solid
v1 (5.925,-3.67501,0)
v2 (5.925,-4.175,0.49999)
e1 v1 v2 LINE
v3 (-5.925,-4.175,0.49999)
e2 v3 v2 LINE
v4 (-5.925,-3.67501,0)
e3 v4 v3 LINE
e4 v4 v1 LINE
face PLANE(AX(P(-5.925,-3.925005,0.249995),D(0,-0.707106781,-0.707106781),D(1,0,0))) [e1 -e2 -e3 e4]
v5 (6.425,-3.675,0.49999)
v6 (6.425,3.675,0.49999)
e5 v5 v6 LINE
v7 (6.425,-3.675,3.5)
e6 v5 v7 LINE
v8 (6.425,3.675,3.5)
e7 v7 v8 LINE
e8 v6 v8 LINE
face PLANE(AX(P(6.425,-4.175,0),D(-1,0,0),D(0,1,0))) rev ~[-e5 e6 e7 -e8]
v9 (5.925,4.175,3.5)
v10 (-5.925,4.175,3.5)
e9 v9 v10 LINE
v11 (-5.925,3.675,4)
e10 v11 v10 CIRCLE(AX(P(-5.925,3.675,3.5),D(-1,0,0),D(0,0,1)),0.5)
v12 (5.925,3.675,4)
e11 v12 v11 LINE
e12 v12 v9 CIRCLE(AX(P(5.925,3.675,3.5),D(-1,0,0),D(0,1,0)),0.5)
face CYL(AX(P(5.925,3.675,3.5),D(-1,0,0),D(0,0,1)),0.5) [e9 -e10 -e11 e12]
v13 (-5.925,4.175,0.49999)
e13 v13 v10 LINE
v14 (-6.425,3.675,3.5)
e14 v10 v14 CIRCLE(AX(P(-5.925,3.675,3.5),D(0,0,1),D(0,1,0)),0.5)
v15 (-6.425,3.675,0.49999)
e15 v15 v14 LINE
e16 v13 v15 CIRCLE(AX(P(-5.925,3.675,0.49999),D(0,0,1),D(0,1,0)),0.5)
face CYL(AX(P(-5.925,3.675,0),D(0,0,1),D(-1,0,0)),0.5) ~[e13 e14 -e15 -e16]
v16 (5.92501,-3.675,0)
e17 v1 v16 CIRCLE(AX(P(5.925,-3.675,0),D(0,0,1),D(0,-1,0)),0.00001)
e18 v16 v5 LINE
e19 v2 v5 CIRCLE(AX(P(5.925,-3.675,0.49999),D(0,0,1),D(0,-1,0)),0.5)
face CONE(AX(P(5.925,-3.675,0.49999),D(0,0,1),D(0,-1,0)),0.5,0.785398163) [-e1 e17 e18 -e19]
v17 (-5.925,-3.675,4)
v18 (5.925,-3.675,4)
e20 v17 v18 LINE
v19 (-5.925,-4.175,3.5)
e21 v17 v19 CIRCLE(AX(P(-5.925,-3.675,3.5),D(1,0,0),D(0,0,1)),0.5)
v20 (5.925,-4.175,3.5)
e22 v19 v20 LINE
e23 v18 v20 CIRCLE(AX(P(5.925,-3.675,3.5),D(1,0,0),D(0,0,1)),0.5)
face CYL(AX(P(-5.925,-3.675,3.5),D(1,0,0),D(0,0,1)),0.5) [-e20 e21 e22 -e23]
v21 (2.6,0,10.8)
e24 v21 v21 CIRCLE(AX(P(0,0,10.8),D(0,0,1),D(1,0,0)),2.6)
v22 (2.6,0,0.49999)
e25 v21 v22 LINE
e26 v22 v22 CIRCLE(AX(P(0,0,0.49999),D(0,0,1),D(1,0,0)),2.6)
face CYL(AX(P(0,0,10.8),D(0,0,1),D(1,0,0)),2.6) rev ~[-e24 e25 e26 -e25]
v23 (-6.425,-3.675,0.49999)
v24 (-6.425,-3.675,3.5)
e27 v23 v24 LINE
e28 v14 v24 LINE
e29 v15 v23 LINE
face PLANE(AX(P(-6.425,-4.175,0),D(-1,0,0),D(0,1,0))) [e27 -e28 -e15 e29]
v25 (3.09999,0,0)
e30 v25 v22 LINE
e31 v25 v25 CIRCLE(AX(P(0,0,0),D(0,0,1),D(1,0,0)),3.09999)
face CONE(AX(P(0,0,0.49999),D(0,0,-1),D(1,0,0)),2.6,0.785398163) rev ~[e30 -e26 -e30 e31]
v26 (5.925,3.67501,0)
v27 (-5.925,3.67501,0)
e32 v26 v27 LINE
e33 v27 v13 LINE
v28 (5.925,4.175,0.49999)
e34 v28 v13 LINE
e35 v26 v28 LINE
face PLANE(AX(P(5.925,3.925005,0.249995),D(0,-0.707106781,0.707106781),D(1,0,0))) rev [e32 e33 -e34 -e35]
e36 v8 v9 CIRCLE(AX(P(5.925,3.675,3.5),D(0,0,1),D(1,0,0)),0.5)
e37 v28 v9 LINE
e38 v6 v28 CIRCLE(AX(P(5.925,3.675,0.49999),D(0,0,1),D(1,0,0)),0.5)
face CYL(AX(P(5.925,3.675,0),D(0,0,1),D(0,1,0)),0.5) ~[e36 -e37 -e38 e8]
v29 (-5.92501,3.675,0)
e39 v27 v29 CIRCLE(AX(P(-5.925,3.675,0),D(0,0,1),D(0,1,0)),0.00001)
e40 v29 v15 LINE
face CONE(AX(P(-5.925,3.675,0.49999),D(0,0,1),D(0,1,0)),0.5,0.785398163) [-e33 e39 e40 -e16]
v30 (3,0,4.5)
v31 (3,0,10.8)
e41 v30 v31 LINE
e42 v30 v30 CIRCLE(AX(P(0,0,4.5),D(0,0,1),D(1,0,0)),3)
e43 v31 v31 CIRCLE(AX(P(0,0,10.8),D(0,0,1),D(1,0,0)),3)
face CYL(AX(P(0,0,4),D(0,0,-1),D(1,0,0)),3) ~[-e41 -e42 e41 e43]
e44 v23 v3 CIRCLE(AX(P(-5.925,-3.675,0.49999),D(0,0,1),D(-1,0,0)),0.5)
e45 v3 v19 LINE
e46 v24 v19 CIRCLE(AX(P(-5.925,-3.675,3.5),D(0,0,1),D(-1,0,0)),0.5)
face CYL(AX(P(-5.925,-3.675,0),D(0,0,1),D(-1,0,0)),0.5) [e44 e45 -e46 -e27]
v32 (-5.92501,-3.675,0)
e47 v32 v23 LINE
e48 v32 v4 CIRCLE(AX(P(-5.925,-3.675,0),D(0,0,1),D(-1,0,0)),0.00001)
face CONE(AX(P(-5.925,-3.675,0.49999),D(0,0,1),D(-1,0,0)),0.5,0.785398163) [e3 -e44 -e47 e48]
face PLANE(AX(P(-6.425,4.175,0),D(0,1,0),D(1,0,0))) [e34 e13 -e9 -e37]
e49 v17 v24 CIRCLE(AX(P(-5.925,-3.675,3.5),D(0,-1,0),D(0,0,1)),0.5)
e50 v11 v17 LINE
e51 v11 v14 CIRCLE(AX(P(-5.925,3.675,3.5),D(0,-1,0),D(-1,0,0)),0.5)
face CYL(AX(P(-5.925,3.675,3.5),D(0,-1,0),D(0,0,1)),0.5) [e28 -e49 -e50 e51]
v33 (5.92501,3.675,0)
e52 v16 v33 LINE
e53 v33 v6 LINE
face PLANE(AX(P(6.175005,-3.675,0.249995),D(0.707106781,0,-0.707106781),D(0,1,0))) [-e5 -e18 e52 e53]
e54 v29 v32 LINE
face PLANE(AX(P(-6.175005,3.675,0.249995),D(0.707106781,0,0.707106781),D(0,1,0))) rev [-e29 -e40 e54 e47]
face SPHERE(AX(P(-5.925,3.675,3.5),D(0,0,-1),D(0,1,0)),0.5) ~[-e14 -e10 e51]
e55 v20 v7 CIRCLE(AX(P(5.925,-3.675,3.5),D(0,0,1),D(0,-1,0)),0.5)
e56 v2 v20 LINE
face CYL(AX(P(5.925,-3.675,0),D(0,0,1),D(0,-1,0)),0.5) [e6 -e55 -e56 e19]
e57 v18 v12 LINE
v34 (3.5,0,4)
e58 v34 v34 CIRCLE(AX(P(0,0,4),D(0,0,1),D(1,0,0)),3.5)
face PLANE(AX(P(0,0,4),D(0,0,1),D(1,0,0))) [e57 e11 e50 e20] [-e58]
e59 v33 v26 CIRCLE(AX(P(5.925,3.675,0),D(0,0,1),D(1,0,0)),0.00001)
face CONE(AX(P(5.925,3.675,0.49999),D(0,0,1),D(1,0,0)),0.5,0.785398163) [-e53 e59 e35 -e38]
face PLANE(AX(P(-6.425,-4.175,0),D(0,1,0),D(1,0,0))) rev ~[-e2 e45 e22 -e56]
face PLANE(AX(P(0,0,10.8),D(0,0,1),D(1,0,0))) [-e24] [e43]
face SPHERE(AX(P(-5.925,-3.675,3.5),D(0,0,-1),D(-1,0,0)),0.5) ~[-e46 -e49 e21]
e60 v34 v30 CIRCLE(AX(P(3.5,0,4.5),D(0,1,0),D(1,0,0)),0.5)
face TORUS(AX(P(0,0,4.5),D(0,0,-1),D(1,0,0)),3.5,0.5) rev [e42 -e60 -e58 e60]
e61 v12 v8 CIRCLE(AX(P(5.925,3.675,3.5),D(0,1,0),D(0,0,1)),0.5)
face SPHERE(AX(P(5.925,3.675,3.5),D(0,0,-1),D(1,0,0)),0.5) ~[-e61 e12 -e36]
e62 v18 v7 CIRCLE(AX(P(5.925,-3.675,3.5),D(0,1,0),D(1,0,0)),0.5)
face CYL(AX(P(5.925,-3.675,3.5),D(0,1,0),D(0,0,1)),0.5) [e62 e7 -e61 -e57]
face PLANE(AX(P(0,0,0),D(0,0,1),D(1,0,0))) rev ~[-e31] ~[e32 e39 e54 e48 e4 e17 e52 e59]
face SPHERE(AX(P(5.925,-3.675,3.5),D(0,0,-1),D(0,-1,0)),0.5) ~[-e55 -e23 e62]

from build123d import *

# Parameters (mm, degrees)
F0_W     = 12.85
F0_H     = 8.35
F1_DEPTH = 4
F2_R     = 3
F3_DEPTH = 6.8
F4_R     = 2.6
F5_DEPTH = 10.801
F6_R     = 0.5
F7_R     = 0.5
F8_SIZE  = 0.49999


# Not quite as in the source:
# - a fillet or chamfer is up to 0.001 mm smaller than in the source, because OpenCascade refuses the exact size


with BuildPart() as f1:
    # F0 (on Top) → F1 (new body)
    with BuildSketch(Plane.XY):
        Rectangle(F0_W, F0_H)
    extrude(amount=F1_DEPTH)

    # F2 (on face) → F3 (join)
    with BuildSketch(Plane.XY.offset(4)):
        Circle(F2_R)
    extrude(amount=F3_DEPTH)

    # F4 (on face) → F5 (cut, through all)
    with BuildSketch(Plane.XY.offset(10.8)):
        Circle(F4_R)
    extrude(amount=-F5_DEPTH, mode=Mode.SUBTRACT)

    # F6
    f6_edges = [f1.edges().sort_by_distance(p)[0] for p in [
        (-6.425, 4.175, 2),
        (6.425, 4.175, 2),
        (6.425, -4.175, 2),
        (-6.425, -4.175, 2),
    ]]
    fillet(f6_edges, radius=F6_R)

    # F7
    f7_edges = [f1.edges().sort_by_distance(p)[0] for p in [
        (0, -4.175, 4),
        (-6.278553, -4.028553, 4),
        (6.278553, -4.028553, 4),
        (-6.425, 0, 4),
        (6.425, 0, 4),
        (-6.278553, 4.028553, 4),
        (6.278553, 4.028553, 4),
        (0, 4.175, 4),
        (-3, 0, 4),
    ]]
    fillet(f7_edges, radius=F7_R)

    # F8 (size 0.5 in the source; OpenCascade refuses exactly that, so slightly less here)
    f8_edges = [f1.edges().sort_by_distance(p)[0] for p in [
        (0, -4.175, 0),
        (-6.278553, -4.028553, 0),
        (6.278553, -4.028553, 0),
        (-6.425, 0, 0),
        (6.425, 0, 0),
        (-6.278553, 4.028553, 0),
        (6.278553, 4.028553, 0),
        (0, 4.175, 0),
        (-2.6, 0, 0),
    ]]
    chamfer(f8_edges, length=F8_SIZE)


solid = f1.part
